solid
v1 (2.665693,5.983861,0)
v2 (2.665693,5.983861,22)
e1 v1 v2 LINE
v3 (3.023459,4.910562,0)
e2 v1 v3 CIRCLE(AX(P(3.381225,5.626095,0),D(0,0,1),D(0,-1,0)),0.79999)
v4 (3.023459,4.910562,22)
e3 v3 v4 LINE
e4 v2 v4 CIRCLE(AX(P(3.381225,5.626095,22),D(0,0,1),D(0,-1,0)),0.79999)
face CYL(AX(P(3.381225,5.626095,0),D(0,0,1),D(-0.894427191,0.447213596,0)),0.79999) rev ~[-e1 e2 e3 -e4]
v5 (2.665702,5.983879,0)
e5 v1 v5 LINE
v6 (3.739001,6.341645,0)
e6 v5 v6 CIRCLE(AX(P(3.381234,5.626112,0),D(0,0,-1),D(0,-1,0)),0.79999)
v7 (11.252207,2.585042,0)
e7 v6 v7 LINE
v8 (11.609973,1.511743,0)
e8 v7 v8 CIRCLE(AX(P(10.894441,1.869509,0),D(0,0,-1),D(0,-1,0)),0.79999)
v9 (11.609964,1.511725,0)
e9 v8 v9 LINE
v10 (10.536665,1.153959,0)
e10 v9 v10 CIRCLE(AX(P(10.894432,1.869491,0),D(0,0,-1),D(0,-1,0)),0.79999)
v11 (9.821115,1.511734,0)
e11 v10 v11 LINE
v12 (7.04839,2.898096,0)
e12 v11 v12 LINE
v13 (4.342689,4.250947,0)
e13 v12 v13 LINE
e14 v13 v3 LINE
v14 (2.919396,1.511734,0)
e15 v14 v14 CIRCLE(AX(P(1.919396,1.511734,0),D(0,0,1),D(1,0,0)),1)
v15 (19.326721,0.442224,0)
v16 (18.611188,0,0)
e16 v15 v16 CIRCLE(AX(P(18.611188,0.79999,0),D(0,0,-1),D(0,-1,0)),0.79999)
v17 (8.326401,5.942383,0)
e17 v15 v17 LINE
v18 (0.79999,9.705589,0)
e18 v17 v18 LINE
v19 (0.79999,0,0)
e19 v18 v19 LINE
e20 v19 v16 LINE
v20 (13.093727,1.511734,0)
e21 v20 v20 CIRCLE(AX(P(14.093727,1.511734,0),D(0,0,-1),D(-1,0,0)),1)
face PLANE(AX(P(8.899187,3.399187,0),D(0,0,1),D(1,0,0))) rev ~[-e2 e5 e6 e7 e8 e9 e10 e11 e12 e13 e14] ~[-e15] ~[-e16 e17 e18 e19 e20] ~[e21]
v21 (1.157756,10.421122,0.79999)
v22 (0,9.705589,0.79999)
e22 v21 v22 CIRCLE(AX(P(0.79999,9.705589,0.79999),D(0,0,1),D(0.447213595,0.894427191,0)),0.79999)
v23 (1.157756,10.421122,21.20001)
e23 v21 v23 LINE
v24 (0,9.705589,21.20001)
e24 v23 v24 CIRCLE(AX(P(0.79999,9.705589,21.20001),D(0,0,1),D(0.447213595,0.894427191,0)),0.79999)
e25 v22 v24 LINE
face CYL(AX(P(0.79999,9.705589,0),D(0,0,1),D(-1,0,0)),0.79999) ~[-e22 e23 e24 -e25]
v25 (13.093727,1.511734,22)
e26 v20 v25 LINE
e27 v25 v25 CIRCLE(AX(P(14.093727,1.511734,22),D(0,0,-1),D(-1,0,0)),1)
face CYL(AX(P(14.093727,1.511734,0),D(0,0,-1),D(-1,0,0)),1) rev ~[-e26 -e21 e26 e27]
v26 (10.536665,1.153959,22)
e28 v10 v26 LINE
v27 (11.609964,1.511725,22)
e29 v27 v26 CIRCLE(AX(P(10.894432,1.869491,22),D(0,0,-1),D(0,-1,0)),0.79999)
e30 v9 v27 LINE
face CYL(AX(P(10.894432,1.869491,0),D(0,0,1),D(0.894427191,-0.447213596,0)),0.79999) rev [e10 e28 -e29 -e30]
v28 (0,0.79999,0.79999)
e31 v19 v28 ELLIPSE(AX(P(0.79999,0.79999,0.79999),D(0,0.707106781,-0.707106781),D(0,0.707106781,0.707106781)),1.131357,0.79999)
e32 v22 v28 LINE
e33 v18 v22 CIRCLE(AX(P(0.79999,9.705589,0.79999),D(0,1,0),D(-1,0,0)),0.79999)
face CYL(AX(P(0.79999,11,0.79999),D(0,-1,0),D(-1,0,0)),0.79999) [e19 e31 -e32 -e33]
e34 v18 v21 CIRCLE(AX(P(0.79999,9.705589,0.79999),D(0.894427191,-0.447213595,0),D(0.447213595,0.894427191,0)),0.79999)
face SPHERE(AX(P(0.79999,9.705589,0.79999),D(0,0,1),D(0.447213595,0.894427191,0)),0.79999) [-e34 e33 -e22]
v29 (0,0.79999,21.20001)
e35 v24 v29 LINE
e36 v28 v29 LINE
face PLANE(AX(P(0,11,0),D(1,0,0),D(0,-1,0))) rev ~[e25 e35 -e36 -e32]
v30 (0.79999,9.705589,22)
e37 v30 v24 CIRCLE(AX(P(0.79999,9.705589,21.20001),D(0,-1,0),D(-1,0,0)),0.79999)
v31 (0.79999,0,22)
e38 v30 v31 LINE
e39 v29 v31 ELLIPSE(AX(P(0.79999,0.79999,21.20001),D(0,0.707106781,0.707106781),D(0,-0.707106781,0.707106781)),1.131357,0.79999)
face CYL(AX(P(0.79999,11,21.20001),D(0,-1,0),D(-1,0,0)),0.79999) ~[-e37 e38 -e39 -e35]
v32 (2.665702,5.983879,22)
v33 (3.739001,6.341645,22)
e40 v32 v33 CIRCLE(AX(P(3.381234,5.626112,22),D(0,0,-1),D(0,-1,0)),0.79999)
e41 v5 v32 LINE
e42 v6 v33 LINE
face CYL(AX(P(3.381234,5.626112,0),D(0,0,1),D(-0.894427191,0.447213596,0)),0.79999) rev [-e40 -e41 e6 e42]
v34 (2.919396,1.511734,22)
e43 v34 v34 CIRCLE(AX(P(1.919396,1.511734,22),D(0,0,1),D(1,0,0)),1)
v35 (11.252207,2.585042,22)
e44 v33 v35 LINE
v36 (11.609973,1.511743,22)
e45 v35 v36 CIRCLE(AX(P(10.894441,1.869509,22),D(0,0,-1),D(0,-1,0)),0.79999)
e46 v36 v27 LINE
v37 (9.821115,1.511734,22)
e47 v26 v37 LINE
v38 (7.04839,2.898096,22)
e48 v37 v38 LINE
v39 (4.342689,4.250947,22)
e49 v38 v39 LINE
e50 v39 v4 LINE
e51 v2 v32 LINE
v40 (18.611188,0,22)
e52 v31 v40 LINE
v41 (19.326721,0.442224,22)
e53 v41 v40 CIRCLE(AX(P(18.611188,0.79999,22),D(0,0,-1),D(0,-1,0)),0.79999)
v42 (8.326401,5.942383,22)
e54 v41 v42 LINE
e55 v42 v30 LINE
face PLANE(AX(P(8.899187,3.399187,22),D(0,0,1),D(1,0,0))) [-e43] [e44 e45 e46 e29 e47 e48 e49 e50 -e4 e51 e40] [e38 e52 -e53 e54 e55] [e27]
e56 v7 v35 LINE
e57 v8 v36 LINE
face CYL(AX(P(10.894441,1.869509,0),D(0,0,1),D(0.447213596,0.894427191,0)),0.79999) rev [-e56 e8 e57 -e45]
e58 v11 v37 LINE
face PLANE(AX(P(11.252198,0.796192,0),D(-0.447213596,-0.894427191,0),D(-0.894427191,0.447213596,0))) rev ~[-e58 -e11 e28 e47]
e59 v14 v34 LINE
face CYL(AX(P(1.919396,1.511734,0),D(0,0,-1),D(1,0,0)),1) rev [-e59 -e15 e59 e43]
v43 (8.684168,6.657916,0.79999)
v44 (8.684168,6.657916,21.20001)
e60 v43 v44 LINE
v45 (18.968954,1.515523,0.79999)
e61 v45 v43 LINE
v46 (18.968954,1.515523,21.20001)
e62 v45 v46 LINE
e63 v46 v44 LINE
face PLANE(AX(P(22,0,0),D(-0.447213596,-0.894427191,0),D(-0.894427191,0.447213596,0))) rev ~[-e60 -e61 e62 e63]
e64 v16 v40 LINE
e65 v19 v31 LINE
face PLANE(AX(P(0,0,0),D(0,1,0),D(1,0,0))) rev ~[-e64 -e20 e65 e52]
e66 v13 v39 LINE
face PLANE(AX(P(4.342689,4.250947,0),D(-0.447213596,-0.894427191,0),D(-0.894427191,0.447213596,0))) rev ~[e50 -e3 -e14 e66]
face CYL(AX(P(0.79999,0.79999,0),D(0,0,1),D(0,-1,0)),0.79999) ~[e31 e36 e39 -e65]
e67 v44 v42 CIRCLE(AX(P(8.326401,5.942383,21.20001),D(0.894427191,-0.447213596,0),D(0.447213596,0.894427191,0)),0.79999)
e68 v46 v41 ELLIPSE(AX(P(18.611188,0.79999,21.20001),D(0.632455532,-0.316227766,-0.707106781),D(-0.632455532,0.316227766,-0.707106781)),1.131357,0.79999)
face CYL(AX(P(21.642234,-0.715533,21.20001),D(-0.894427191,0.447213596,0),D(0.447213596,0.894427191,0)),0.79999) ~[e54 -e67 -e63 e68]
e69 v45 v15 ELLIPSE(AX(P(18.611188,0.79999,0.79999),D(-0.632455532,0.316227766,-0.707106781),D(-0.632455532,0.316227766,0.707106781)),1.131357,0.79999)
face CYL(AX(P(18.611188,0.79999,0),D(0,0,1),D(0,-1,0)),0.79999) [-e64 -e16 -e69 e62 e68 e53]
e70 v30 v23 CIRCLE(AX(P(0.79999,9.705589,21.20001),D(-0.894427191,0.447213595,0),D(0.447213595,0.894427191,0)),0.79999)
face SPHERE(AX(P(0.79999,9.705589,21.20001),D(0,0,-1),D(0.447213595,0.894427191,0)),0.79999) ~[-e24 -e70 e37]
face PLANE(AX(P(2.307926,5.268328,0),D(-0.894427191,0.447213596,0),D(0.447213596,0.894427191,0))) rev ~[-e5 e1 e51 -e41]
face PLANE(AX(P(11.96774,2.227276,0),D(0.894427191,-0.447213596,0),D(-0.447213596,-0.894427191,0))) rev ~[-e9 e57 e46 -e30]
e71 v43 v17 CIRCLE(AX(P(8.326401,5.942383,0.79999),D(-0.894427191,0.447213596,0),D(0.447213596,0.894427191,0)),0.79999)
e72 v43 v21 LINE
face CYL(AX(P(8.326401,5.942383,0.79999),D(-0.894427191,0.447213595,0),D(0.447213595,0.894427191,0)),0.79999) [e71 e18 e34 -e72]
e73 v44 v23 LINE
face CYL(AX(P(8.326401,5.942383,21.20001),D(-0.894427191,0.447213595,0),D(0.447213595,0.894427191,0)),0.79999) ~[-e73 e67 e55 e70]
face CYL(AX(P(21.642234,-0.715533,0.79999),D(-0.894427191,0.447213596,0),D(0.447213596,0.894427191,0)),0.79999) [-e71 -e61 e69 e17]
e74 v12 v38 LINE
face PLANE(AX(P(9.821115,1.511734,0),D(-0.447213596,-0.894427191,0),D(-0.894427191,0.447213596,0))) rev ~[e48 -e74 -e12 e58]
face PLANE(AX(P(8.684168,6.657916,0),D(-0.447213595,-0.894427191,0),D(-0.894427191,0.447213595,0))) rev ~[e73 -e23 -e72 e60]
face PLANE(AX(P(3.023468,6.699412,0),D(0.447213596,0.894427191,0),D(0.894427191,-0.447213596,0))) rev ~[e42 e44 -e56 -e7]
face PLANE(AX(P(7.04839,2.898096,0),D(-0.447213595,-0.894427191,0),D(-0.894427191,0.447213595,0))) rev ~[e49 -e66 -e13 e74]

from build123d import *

# Parameters (mm, degrees)
F0_R     = 1
F1_DEPTH = 22
F3_R     = 0.79999


# Not quite as in the source:
# - a fillet or chamfer is up to 0.001 mm smaller than in the source, because OpenCascade refuses the exact size
# - a feature of the source that left no trace in its solid (it failed there, or was rolled back) is left out


with BuildPart() as f1:
    # F0 (on Top) → F1 (new body)
    with BuildSketch(Plane.XY):
        Polygon((0, 10), (0, 0), (20, 0), (22, 0), (8.6841676623, 6.6579161689), (0, 11), align=None)
        with Locations((1.9193962216, 1.5117339551)):
            Circle(F0_R, mode=Mode.SUBTRACT)
        Polygon((3.0234679102, 6.6994116629), (9.2844582472, 3.5689164944), (11.9677398202, 2.2272757079), (11.6099689438, 1.5117339551), (11.2521980674, 0.7961922023), (9.8211145618, 1.5117339551), (7.0483902697, 2.8980961012), (4.3426890694, 4.2509467013), (2.3079261574, 5.2683281573), align=None, mode=Mode.SUBTRACT)
        with BuildLine():
            ThreePointArc((15.0937268734, 1.5117339551), (14.0937268734, 0.5117339551), (13.0937268734, 1.5117339551))
            ThreePointArc((13.0937268734, 1.5117339551), (14.0937268734, 2.5117339551), (15.0937268734, 1.5117339551))
        make_face(mode=Mode.SUBTRACT)
    extrude(amount=F1_DEPTH)

    # F3 (radius 0.8 in the source; OpenCascade refuses exactly that, so slightly less here)
    f3_edges = [f1.edges().sort_by_distance(p)[0] for p in [
        (0, 11, 11),
        (22, 0, 11),
        (11, 5.5, 0),
        (11, 5.5, 22),
        (0, 5.5, 22),
        (2.307926, 5.268328, 11),
        (3.023468, 6.699412, 11),
        (11.252198, 0.796192, 11),
        (11.96774, 2.227276, 11),
        (0, 0, 11),
        (0, 5.5, 0),
    ]]
    fillet(f3_edges, radius=F3_R)


solid = f1.part
